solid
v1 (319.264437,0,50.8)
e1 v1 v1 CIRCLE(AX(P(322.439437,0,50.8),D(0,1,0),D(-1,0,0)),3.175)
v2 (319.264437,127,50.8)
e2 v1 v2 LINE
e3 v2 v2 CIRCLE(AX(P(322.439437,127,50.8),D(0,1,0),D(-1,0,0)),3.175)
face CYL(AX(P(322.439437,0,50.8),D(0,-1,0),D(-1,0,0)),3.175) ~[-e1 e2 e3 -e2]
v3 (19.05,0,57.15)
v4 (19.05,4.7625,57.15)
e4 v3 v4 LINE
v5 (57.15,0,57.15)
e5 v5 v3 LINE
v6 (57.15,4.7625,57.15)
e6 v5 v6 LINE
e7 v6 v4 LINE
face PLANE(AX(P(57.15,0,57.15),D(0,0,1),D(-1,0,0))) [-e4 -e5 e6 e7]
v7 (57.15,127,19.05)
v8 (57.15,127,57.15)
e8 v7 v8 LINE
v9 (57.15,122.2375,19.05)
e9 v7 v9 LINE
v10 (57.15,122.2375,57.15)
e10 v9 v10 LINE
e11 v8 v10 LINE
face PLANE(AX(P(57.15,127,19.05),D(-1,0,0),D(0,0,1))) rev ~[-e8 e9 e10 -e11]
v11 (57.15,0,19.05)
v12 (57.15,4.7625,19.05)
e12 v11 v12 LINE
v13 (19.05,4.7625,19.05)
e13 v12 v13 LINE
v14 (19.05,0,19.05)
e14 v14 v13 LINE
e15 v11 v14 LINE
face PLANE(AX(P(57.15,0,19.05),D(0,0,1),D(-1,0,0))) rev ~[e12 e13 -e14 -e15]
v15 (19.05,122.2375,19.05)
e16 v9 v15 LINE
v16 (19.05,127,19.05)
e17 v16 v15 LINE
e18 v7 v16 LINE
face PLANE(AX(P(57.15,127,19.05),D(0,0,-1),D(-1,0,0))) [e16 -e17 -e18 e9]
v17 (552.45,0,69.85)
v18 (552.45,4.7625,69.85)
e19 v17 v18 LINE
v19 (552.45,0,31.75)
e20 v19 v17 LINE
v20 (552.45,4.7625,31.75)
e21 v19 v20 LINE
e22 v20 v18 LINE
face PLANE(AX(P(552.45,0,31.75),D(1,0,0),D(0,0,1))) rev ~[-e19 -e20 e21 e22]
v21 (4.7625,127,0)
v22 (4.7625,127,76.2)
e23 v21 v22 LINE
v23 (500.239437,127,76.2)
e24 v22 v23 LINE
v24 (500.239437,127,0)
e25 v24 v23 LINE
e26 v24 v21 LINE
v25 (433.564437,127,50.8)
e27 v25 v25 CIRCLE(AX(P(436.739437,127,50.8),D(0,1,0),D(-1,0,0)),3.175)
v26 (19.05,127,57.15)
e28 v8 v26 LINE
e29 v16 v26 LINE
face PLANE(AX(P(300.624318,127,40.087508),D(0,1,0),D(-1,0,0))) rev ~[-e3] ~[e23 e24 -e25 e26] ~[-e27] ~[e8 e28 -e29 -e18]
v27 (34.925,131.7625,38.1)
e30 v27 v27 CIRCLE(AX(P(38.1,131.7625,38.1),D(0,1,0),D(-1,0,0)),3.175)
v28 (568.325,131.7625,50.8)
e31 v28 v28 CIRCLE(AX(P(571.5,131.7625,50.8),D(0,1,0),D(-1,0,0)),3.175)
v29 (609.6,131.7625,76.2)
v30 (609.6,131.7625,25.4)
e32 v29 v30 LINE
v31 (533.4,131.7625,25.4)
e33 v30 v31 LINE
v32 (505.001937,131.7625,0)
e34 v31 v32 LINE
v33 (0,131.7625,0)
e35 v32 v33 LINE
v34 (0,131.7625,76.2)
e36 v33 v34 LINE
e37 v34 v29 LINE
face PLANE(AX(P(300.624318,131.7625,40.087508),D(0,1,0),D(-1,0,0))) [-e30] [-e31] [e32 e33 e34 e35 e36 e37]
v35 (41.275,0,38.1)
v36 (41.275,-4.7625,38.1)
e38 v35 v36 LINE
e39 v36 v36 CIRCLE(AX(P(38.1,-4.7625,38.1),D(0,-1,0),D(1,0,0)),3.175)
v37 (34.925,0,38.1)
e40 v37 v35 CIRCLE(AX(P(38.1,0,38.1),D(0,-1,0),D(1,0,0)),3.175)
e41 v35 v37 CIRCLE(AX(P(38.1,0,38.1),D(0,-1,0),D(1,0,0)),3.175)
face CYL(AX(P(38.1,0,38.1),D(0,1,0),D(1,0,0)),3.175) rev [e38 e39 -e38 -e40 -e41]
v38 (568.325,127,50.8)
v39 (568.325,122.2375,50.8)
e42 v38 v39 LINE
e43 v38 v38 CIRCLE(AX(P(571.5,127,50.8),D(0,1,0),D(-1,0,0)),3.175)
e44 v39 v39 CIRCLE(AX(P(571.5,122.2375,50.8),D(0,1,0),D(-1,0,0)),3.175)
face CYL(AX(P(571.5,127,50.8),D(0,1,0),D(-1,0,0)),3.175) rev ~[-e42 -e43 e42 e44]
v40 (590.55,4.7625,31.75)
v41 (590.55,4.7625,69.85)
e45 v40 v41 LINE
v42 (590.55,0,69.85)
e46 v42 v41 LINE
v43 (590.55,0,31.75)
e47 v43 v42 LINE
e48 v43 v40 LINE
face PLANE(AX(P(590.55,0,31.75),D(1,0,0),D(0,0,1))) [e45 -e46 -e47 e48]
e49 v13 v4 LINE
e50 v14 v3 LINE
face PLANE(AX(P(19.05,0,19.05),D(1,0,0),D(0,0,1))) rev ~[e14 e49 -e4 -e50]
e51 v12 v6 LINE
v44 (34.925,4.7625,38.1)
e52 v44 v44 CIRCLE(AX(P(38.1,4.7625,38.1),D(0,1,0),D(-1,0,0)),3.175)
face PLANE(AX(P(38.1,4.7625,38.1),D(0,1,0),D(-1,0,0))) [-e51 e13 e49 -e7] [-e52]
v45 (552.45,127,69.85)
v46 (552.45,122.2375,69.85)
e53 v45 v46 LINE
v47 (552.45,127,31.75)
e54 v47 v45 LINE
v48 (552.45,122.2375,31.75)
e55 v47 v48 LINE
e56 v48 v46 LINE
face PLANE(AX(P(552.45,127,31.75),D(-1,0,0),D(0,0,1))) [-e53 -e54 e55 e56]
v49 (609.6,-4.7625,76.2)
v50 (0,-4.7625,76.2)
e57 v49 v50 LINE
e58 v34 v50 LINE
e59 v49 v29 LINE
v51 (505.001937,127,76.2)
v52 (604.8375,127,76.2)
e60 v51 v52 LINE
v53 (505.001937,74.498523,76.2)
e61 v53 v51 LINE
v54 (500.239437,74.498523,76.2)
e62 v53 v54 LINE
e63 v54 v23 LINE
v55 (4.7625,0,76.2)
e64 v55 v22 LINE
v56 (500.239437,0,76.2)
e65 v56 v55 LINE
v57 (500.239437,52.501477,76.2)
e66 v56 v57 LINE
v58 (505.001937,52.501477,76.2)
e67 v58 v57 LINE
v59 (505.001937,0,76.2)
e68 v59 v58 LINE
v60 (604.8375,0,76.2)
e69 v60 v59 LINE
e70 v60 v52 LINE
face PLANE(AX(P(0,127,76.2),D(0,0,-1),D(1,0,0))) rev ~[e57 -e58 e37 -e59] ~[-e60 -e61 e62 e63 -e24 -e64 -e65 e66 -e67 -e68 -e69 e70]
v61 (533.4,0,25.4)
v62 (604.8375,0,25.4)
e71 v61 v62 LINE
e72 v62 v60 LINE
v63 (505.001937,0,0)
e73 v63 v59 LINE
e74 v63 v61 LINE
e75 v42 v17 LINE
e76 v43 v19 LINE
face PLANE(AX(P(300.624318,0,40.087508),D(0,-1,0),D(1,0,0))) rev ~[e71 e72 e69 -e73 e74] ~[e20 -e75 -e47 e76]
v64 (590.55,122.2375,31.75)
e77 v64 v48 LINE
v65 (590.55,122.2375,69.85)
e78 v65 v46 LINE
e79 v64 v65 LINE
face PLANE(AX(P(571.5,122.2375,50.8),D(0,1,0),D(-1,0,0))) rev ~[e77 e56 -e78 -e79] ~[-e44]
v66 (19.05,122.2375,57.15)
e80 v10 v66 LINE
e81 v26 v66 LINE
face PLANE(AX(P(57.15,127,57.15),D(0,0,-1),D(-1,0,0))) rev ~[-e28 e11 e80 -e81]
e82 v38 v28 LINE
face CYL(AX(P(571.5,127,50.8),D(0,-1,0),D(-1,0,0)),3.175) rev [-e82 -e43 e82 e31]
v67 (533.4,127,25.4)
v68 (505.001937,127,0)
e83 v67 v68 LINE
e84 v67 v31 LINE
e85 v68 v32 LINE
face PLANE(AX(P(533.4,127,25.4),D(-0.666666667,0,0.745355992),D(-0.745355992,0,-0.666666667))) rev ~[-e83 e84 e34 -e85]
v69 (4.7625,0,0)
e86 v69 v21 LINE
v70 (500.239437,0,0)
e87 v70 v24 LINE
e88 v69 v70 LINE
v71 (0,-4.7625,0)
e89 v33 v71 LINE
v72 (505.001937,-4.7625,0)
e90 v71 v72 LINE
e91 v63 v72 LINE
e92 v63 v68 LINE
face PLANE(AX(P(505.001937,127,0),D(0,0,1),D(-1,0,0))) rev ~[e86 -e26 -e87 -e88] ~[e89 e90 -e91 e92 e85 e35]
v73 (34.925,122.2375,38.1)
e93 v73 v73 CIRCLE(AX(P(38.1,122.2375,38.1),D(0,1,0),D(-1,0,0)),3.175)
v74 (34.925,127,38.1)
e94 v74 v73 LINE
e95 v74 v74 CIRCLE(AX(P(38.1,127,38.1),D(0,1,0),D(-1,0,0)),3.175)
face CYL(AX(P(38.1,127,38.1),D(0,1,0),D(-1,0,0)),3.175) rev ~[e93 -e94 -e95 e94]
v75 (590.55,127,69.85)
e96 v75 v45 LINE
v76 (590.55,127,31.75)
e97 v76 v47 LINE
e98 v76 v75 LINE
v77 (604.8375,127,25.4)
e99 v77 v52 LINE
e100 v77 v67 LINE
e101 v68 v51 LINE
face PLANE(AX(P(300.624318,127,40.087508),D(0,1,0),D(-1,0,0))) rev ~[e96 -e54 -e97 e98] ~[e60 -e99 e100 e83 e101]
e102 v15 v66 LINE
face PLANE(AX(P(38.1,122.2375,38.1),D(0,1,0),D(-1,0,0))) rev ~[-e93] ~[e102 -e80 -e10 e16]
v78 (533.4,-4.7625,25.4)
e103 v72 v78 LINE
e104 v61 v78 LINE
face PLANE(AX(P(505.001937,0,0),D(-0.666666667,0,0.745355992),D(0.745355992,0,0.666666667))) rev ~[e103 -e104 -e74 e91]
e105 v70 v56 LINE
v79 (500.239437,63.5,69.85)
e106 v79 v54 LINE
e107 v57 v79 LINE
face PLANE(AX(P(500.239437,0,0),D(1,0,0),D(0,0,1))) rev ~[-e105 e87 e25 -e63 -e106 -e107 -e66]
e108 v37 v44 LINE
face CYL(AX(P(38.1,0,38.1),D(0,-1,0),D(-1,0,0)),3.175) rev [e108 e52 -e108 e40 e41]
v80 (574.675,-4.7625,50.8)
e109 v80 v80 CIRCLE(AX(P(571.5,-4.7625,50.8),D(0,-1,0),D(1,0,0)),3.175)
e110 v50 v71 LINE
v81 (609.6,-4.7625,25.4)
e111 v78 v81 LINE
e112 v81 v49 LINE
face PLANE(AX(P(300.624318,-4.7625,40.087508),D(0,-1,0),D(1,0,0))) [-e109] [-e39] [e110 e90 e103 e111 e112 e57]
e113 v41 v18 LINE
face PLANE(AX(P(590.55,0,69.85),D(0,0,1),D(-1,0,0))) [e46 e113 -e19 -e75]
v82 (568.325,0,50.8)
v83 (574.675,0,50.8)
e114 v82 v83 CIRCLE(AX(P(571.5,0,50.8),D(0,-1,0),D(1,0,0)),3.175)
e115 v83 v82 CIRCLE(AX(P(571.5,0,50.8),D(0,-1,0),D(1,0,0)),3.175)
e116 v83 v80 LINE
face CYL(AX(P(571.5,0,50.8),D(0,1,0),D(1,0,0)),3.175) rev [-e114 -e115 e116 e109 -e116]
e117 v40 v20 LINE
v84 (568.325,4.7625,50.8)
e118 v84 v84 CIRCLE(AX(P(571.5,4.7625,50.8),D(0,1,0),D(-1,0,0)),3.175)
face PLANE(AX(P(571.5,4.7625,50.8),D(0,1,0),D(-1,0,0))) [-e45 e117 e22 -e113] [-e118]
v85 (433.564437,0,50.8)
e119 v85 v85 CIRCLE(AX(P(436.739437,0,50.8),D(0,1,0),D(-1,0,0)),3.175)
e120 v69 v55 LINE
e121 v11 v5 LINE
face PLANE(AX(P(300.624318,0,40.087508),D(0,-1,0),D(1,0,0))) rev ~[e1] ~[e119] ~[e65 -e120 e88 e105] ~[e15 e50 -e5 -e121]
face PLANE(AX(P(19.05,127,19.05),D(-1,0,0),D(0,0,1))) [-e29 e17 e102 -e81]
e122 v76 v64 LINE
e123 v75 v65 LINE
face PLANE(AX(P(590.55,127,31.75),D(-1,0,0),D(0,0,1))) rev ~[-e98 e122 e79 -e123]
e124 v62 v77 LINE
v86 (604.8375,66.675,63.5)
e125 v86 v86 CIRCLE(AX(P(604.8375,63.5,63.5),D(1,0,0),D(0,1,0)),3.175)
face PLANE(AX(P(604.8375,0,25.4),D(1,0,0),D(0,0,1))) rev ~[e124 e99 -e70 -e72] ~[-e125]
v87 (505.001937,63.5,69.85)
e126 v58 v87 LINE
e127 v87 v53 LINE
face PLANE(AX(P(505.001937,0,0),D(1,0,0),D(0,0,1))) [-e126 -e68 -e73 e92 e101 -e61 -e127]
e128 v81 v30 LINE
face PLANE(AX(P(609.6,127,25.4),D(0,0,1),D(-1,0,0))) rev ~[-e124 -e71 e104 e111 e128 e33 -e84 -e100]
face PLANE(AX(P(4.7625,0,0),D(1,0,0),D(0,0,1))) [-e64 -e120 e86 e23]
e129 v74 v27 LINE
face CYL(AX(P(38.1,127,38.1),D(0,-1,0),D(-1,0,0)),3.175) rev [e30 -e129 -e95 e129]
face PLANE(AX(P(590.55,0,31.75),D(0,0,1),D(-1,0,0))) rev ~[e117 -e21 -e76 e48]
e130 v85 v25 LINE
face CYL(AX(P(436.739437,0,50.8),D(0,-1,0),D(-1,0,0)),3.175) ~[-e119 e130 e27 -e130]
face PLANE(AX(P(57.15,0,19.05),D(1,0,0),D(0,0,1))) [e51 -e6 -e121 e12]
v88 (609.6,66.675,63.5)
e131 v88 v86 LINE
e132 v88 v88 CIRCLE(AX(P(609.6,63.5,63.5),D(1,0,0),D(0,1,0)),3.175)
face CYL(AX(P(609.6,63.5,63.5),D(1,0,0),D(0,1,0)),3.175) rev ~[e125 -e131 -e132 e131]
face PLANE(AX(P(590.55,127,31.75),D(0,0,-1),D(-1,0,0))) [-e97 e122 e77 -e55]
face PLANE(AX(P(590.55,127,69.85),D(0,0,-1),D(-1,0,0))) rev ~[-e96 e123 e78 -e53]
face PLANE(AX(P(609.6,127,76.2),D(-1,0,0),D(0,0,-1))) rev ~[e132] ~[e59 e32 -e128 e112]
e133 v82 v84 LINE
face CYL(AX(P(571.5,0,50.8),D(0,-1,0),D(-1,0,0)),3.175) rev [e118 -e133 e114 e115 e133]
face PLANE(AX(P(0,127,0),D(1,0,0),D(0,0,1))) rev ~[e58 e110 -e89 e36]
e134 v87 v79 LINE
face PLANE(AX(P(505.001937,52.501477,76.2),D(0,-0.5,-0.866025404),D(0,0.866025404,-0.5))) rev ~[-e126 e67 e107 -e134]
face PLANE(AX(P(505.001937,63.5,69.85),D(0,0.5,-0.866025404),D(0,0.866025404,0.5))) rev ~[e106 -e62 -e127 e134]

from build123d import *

# Parameters (mm, degrees)
F0_R      = 3.175
F1_DEPTH  = 4.7625
F2_W      = 4.7625
F2_H      = 50.8
F2_H_2    = 76.2
F2_R      = 3.175
F3_DEPTH  = 127
F4_R      = 3.175
F5_DEPTH  = 4.7625
F6_R      = 3.175
F7_DEPTH  = 25.4
F9_DEPTH  = 25.4
F10_W     = 38.1
F10_H     = 38.1
F10_R     = 3.175
F11_DEPTH = 4.7625
F12_W     = 38.1
F12_H     = 38.1
F12_R     = 3.175
F13_DEPTH = 4.7625
F14_W     = 38.1
F14_H     = 38.1
F14_R     = 3.175
F15_DEPTH = 4.7625
F16_W     = 38.1
F16_H     = 38.1
F16_R     = 3.175
F17_DEPTH = 4.7625


# Not quite as in the source:
# - a length typed as a fraction of an inch, garbled in the dataset ("3 / 203.2 mm" for 3/8 in), is restored


with BuildPart() as f1:
    # F0 (on Front) → F1 (new body)
    with BuildSketch(Plane.XZ):
        Polygon((0, 76.2), (0, 0), (505.0019366858, 0), (533.4, 25.4), (609.6, 25.4), (609.6, 76.2), align=None)
        with Locations((38.1, 38.1)):
            Circle(F0_R, mode=Mode.SUBTRACT)
        with Locations((571.5, 50.8)):
            Circle(F0_R, mode=Mode.SUBTRACT)
    extrude(amount=F1_DEPTH)

    # F2 (on face) → F3 (join)
    with BuildSketch(Plane(origin=(0, 0, 0), x_dir=(-1, 0, 0), z_dir=(0, 1, 0))):
        with Locations((-607.21875, 50.8)):
            Rectangle(F2_W, F2_H)
        with Locations((-502.6206866858, 38.1)):
            Rectangle(F2_W, F2_H_2)
        with Locations((-436.7394366858, 50.8)):
            Circle(F2_R)
        with Locations((-322.4394366858, 50.8)):
            Circle(F2_R)
        with Locations((-2.38125, 38.1)):
            Rectangle(F2_W, F2_H_2)
    extrude(amount=F3_DEPTH)

    # F4 (on face) → F5 (join)
    with BuildSketch(Plane(origin=(0, 127, 0), x_dir=(-1, 0, 0), z_dir=(0, 1, 0))):
        Polygon((0, 76.2), (-609.6, 76.2), (-609.6, 25.4), (-533.4, 25.4), (-505.0019366858, 0), (0, 0), align=None)
        with Locations((-571.5, 50.8)):
            Circle(F4_R, mode=Mode.SUBTRACT)
        with Locations((-38.1, 38.1)):
            Circle(F4_R, mode=Mode.SUBTRACT)
    extrude(amount=F5_DEPTH)

    # F6 (on face) → F7 (cut)
    with BuildSketch(Plane.YZ.offset(609.6)):
        with Locations((63.5, 63.5)):
            Circle(F6_R)
    extrude(amount=-F7_DEPTH, mode=Mode.SUBTRACT)

    # F8 (on face) → F9 (cut)
    with BuildSketch(Plane.YZ.offset(505.0019366858)):
        Polygon((74.4985226281, 76.2), (63.5, 76.2), (63.5, 69.85), align=None)
        Polygon((63.5, 69.85), (63.5, 76.2), (52.5014773719, 76.2), align=None)
    extrude(amount=-F9_DEPTH, mode=Mode.SUBTRACT)

    # F10 (on face) → F11 (join)
    with BuildSketch(Plane(origin=(0, 0, 0), x_dir=(-1, 0, 0), z_dir=(0, 1, 0))):
        with Locations((-38.1, 38.1)):
            Rectangle(F10_W, F10_H)
        with Locations((-38.1, 38.1)):
            Circle(F10_R, mode=Mode.SUBTRACT)
    extrude(amount=F11_DEPTH)

    # F12 (on face) → F13 (join)
    with BuildSketch(Plane(origin=(0, 0, 0), x_dir=(-1, 0, 0), z_dir=(0, 1, 0))):
        with Locations((-571.5, 50.8)):
            Rectangle(F12_W, F12_H)
        with Locations((-571.5, 50.8)):
            Circle(F12_R, mode=Mode.SUBTRACT)
    extrude(amount=F13_DEPTH)

    # F14 (on face) → F15 (join)
    with BuildSketch(Plane(origin=(0, 127, 0), x_dir=(-1, 0, 0), z_dir=(0, 1, 0))):
        with Locations((-38.1, 38.1)):
            Rectangle(F14_W, F14_H)
        with Locations((-38.1, 38.1)):
            Circle(F14_R, mode=Mode.SUBTRACT)
    extrude(amount=-F15_DEPTH)

    # F16 (on face) → F17 (join)
    with BuildSketch(Plane(origin=(0, 127, 0), x_dir=(-1, 0, 0), z_dir=(0, 1, 0))):
        with Locations((-571.5, 50.8)):
            Rectangle(F16_W, F16_H)
        with Locations((-571.5, 50.8)):
            Circle(F16_R, mode=Mode.SUBTRACT)
    extrude(amount=-F17_DEPTH)


solid = f1.part
